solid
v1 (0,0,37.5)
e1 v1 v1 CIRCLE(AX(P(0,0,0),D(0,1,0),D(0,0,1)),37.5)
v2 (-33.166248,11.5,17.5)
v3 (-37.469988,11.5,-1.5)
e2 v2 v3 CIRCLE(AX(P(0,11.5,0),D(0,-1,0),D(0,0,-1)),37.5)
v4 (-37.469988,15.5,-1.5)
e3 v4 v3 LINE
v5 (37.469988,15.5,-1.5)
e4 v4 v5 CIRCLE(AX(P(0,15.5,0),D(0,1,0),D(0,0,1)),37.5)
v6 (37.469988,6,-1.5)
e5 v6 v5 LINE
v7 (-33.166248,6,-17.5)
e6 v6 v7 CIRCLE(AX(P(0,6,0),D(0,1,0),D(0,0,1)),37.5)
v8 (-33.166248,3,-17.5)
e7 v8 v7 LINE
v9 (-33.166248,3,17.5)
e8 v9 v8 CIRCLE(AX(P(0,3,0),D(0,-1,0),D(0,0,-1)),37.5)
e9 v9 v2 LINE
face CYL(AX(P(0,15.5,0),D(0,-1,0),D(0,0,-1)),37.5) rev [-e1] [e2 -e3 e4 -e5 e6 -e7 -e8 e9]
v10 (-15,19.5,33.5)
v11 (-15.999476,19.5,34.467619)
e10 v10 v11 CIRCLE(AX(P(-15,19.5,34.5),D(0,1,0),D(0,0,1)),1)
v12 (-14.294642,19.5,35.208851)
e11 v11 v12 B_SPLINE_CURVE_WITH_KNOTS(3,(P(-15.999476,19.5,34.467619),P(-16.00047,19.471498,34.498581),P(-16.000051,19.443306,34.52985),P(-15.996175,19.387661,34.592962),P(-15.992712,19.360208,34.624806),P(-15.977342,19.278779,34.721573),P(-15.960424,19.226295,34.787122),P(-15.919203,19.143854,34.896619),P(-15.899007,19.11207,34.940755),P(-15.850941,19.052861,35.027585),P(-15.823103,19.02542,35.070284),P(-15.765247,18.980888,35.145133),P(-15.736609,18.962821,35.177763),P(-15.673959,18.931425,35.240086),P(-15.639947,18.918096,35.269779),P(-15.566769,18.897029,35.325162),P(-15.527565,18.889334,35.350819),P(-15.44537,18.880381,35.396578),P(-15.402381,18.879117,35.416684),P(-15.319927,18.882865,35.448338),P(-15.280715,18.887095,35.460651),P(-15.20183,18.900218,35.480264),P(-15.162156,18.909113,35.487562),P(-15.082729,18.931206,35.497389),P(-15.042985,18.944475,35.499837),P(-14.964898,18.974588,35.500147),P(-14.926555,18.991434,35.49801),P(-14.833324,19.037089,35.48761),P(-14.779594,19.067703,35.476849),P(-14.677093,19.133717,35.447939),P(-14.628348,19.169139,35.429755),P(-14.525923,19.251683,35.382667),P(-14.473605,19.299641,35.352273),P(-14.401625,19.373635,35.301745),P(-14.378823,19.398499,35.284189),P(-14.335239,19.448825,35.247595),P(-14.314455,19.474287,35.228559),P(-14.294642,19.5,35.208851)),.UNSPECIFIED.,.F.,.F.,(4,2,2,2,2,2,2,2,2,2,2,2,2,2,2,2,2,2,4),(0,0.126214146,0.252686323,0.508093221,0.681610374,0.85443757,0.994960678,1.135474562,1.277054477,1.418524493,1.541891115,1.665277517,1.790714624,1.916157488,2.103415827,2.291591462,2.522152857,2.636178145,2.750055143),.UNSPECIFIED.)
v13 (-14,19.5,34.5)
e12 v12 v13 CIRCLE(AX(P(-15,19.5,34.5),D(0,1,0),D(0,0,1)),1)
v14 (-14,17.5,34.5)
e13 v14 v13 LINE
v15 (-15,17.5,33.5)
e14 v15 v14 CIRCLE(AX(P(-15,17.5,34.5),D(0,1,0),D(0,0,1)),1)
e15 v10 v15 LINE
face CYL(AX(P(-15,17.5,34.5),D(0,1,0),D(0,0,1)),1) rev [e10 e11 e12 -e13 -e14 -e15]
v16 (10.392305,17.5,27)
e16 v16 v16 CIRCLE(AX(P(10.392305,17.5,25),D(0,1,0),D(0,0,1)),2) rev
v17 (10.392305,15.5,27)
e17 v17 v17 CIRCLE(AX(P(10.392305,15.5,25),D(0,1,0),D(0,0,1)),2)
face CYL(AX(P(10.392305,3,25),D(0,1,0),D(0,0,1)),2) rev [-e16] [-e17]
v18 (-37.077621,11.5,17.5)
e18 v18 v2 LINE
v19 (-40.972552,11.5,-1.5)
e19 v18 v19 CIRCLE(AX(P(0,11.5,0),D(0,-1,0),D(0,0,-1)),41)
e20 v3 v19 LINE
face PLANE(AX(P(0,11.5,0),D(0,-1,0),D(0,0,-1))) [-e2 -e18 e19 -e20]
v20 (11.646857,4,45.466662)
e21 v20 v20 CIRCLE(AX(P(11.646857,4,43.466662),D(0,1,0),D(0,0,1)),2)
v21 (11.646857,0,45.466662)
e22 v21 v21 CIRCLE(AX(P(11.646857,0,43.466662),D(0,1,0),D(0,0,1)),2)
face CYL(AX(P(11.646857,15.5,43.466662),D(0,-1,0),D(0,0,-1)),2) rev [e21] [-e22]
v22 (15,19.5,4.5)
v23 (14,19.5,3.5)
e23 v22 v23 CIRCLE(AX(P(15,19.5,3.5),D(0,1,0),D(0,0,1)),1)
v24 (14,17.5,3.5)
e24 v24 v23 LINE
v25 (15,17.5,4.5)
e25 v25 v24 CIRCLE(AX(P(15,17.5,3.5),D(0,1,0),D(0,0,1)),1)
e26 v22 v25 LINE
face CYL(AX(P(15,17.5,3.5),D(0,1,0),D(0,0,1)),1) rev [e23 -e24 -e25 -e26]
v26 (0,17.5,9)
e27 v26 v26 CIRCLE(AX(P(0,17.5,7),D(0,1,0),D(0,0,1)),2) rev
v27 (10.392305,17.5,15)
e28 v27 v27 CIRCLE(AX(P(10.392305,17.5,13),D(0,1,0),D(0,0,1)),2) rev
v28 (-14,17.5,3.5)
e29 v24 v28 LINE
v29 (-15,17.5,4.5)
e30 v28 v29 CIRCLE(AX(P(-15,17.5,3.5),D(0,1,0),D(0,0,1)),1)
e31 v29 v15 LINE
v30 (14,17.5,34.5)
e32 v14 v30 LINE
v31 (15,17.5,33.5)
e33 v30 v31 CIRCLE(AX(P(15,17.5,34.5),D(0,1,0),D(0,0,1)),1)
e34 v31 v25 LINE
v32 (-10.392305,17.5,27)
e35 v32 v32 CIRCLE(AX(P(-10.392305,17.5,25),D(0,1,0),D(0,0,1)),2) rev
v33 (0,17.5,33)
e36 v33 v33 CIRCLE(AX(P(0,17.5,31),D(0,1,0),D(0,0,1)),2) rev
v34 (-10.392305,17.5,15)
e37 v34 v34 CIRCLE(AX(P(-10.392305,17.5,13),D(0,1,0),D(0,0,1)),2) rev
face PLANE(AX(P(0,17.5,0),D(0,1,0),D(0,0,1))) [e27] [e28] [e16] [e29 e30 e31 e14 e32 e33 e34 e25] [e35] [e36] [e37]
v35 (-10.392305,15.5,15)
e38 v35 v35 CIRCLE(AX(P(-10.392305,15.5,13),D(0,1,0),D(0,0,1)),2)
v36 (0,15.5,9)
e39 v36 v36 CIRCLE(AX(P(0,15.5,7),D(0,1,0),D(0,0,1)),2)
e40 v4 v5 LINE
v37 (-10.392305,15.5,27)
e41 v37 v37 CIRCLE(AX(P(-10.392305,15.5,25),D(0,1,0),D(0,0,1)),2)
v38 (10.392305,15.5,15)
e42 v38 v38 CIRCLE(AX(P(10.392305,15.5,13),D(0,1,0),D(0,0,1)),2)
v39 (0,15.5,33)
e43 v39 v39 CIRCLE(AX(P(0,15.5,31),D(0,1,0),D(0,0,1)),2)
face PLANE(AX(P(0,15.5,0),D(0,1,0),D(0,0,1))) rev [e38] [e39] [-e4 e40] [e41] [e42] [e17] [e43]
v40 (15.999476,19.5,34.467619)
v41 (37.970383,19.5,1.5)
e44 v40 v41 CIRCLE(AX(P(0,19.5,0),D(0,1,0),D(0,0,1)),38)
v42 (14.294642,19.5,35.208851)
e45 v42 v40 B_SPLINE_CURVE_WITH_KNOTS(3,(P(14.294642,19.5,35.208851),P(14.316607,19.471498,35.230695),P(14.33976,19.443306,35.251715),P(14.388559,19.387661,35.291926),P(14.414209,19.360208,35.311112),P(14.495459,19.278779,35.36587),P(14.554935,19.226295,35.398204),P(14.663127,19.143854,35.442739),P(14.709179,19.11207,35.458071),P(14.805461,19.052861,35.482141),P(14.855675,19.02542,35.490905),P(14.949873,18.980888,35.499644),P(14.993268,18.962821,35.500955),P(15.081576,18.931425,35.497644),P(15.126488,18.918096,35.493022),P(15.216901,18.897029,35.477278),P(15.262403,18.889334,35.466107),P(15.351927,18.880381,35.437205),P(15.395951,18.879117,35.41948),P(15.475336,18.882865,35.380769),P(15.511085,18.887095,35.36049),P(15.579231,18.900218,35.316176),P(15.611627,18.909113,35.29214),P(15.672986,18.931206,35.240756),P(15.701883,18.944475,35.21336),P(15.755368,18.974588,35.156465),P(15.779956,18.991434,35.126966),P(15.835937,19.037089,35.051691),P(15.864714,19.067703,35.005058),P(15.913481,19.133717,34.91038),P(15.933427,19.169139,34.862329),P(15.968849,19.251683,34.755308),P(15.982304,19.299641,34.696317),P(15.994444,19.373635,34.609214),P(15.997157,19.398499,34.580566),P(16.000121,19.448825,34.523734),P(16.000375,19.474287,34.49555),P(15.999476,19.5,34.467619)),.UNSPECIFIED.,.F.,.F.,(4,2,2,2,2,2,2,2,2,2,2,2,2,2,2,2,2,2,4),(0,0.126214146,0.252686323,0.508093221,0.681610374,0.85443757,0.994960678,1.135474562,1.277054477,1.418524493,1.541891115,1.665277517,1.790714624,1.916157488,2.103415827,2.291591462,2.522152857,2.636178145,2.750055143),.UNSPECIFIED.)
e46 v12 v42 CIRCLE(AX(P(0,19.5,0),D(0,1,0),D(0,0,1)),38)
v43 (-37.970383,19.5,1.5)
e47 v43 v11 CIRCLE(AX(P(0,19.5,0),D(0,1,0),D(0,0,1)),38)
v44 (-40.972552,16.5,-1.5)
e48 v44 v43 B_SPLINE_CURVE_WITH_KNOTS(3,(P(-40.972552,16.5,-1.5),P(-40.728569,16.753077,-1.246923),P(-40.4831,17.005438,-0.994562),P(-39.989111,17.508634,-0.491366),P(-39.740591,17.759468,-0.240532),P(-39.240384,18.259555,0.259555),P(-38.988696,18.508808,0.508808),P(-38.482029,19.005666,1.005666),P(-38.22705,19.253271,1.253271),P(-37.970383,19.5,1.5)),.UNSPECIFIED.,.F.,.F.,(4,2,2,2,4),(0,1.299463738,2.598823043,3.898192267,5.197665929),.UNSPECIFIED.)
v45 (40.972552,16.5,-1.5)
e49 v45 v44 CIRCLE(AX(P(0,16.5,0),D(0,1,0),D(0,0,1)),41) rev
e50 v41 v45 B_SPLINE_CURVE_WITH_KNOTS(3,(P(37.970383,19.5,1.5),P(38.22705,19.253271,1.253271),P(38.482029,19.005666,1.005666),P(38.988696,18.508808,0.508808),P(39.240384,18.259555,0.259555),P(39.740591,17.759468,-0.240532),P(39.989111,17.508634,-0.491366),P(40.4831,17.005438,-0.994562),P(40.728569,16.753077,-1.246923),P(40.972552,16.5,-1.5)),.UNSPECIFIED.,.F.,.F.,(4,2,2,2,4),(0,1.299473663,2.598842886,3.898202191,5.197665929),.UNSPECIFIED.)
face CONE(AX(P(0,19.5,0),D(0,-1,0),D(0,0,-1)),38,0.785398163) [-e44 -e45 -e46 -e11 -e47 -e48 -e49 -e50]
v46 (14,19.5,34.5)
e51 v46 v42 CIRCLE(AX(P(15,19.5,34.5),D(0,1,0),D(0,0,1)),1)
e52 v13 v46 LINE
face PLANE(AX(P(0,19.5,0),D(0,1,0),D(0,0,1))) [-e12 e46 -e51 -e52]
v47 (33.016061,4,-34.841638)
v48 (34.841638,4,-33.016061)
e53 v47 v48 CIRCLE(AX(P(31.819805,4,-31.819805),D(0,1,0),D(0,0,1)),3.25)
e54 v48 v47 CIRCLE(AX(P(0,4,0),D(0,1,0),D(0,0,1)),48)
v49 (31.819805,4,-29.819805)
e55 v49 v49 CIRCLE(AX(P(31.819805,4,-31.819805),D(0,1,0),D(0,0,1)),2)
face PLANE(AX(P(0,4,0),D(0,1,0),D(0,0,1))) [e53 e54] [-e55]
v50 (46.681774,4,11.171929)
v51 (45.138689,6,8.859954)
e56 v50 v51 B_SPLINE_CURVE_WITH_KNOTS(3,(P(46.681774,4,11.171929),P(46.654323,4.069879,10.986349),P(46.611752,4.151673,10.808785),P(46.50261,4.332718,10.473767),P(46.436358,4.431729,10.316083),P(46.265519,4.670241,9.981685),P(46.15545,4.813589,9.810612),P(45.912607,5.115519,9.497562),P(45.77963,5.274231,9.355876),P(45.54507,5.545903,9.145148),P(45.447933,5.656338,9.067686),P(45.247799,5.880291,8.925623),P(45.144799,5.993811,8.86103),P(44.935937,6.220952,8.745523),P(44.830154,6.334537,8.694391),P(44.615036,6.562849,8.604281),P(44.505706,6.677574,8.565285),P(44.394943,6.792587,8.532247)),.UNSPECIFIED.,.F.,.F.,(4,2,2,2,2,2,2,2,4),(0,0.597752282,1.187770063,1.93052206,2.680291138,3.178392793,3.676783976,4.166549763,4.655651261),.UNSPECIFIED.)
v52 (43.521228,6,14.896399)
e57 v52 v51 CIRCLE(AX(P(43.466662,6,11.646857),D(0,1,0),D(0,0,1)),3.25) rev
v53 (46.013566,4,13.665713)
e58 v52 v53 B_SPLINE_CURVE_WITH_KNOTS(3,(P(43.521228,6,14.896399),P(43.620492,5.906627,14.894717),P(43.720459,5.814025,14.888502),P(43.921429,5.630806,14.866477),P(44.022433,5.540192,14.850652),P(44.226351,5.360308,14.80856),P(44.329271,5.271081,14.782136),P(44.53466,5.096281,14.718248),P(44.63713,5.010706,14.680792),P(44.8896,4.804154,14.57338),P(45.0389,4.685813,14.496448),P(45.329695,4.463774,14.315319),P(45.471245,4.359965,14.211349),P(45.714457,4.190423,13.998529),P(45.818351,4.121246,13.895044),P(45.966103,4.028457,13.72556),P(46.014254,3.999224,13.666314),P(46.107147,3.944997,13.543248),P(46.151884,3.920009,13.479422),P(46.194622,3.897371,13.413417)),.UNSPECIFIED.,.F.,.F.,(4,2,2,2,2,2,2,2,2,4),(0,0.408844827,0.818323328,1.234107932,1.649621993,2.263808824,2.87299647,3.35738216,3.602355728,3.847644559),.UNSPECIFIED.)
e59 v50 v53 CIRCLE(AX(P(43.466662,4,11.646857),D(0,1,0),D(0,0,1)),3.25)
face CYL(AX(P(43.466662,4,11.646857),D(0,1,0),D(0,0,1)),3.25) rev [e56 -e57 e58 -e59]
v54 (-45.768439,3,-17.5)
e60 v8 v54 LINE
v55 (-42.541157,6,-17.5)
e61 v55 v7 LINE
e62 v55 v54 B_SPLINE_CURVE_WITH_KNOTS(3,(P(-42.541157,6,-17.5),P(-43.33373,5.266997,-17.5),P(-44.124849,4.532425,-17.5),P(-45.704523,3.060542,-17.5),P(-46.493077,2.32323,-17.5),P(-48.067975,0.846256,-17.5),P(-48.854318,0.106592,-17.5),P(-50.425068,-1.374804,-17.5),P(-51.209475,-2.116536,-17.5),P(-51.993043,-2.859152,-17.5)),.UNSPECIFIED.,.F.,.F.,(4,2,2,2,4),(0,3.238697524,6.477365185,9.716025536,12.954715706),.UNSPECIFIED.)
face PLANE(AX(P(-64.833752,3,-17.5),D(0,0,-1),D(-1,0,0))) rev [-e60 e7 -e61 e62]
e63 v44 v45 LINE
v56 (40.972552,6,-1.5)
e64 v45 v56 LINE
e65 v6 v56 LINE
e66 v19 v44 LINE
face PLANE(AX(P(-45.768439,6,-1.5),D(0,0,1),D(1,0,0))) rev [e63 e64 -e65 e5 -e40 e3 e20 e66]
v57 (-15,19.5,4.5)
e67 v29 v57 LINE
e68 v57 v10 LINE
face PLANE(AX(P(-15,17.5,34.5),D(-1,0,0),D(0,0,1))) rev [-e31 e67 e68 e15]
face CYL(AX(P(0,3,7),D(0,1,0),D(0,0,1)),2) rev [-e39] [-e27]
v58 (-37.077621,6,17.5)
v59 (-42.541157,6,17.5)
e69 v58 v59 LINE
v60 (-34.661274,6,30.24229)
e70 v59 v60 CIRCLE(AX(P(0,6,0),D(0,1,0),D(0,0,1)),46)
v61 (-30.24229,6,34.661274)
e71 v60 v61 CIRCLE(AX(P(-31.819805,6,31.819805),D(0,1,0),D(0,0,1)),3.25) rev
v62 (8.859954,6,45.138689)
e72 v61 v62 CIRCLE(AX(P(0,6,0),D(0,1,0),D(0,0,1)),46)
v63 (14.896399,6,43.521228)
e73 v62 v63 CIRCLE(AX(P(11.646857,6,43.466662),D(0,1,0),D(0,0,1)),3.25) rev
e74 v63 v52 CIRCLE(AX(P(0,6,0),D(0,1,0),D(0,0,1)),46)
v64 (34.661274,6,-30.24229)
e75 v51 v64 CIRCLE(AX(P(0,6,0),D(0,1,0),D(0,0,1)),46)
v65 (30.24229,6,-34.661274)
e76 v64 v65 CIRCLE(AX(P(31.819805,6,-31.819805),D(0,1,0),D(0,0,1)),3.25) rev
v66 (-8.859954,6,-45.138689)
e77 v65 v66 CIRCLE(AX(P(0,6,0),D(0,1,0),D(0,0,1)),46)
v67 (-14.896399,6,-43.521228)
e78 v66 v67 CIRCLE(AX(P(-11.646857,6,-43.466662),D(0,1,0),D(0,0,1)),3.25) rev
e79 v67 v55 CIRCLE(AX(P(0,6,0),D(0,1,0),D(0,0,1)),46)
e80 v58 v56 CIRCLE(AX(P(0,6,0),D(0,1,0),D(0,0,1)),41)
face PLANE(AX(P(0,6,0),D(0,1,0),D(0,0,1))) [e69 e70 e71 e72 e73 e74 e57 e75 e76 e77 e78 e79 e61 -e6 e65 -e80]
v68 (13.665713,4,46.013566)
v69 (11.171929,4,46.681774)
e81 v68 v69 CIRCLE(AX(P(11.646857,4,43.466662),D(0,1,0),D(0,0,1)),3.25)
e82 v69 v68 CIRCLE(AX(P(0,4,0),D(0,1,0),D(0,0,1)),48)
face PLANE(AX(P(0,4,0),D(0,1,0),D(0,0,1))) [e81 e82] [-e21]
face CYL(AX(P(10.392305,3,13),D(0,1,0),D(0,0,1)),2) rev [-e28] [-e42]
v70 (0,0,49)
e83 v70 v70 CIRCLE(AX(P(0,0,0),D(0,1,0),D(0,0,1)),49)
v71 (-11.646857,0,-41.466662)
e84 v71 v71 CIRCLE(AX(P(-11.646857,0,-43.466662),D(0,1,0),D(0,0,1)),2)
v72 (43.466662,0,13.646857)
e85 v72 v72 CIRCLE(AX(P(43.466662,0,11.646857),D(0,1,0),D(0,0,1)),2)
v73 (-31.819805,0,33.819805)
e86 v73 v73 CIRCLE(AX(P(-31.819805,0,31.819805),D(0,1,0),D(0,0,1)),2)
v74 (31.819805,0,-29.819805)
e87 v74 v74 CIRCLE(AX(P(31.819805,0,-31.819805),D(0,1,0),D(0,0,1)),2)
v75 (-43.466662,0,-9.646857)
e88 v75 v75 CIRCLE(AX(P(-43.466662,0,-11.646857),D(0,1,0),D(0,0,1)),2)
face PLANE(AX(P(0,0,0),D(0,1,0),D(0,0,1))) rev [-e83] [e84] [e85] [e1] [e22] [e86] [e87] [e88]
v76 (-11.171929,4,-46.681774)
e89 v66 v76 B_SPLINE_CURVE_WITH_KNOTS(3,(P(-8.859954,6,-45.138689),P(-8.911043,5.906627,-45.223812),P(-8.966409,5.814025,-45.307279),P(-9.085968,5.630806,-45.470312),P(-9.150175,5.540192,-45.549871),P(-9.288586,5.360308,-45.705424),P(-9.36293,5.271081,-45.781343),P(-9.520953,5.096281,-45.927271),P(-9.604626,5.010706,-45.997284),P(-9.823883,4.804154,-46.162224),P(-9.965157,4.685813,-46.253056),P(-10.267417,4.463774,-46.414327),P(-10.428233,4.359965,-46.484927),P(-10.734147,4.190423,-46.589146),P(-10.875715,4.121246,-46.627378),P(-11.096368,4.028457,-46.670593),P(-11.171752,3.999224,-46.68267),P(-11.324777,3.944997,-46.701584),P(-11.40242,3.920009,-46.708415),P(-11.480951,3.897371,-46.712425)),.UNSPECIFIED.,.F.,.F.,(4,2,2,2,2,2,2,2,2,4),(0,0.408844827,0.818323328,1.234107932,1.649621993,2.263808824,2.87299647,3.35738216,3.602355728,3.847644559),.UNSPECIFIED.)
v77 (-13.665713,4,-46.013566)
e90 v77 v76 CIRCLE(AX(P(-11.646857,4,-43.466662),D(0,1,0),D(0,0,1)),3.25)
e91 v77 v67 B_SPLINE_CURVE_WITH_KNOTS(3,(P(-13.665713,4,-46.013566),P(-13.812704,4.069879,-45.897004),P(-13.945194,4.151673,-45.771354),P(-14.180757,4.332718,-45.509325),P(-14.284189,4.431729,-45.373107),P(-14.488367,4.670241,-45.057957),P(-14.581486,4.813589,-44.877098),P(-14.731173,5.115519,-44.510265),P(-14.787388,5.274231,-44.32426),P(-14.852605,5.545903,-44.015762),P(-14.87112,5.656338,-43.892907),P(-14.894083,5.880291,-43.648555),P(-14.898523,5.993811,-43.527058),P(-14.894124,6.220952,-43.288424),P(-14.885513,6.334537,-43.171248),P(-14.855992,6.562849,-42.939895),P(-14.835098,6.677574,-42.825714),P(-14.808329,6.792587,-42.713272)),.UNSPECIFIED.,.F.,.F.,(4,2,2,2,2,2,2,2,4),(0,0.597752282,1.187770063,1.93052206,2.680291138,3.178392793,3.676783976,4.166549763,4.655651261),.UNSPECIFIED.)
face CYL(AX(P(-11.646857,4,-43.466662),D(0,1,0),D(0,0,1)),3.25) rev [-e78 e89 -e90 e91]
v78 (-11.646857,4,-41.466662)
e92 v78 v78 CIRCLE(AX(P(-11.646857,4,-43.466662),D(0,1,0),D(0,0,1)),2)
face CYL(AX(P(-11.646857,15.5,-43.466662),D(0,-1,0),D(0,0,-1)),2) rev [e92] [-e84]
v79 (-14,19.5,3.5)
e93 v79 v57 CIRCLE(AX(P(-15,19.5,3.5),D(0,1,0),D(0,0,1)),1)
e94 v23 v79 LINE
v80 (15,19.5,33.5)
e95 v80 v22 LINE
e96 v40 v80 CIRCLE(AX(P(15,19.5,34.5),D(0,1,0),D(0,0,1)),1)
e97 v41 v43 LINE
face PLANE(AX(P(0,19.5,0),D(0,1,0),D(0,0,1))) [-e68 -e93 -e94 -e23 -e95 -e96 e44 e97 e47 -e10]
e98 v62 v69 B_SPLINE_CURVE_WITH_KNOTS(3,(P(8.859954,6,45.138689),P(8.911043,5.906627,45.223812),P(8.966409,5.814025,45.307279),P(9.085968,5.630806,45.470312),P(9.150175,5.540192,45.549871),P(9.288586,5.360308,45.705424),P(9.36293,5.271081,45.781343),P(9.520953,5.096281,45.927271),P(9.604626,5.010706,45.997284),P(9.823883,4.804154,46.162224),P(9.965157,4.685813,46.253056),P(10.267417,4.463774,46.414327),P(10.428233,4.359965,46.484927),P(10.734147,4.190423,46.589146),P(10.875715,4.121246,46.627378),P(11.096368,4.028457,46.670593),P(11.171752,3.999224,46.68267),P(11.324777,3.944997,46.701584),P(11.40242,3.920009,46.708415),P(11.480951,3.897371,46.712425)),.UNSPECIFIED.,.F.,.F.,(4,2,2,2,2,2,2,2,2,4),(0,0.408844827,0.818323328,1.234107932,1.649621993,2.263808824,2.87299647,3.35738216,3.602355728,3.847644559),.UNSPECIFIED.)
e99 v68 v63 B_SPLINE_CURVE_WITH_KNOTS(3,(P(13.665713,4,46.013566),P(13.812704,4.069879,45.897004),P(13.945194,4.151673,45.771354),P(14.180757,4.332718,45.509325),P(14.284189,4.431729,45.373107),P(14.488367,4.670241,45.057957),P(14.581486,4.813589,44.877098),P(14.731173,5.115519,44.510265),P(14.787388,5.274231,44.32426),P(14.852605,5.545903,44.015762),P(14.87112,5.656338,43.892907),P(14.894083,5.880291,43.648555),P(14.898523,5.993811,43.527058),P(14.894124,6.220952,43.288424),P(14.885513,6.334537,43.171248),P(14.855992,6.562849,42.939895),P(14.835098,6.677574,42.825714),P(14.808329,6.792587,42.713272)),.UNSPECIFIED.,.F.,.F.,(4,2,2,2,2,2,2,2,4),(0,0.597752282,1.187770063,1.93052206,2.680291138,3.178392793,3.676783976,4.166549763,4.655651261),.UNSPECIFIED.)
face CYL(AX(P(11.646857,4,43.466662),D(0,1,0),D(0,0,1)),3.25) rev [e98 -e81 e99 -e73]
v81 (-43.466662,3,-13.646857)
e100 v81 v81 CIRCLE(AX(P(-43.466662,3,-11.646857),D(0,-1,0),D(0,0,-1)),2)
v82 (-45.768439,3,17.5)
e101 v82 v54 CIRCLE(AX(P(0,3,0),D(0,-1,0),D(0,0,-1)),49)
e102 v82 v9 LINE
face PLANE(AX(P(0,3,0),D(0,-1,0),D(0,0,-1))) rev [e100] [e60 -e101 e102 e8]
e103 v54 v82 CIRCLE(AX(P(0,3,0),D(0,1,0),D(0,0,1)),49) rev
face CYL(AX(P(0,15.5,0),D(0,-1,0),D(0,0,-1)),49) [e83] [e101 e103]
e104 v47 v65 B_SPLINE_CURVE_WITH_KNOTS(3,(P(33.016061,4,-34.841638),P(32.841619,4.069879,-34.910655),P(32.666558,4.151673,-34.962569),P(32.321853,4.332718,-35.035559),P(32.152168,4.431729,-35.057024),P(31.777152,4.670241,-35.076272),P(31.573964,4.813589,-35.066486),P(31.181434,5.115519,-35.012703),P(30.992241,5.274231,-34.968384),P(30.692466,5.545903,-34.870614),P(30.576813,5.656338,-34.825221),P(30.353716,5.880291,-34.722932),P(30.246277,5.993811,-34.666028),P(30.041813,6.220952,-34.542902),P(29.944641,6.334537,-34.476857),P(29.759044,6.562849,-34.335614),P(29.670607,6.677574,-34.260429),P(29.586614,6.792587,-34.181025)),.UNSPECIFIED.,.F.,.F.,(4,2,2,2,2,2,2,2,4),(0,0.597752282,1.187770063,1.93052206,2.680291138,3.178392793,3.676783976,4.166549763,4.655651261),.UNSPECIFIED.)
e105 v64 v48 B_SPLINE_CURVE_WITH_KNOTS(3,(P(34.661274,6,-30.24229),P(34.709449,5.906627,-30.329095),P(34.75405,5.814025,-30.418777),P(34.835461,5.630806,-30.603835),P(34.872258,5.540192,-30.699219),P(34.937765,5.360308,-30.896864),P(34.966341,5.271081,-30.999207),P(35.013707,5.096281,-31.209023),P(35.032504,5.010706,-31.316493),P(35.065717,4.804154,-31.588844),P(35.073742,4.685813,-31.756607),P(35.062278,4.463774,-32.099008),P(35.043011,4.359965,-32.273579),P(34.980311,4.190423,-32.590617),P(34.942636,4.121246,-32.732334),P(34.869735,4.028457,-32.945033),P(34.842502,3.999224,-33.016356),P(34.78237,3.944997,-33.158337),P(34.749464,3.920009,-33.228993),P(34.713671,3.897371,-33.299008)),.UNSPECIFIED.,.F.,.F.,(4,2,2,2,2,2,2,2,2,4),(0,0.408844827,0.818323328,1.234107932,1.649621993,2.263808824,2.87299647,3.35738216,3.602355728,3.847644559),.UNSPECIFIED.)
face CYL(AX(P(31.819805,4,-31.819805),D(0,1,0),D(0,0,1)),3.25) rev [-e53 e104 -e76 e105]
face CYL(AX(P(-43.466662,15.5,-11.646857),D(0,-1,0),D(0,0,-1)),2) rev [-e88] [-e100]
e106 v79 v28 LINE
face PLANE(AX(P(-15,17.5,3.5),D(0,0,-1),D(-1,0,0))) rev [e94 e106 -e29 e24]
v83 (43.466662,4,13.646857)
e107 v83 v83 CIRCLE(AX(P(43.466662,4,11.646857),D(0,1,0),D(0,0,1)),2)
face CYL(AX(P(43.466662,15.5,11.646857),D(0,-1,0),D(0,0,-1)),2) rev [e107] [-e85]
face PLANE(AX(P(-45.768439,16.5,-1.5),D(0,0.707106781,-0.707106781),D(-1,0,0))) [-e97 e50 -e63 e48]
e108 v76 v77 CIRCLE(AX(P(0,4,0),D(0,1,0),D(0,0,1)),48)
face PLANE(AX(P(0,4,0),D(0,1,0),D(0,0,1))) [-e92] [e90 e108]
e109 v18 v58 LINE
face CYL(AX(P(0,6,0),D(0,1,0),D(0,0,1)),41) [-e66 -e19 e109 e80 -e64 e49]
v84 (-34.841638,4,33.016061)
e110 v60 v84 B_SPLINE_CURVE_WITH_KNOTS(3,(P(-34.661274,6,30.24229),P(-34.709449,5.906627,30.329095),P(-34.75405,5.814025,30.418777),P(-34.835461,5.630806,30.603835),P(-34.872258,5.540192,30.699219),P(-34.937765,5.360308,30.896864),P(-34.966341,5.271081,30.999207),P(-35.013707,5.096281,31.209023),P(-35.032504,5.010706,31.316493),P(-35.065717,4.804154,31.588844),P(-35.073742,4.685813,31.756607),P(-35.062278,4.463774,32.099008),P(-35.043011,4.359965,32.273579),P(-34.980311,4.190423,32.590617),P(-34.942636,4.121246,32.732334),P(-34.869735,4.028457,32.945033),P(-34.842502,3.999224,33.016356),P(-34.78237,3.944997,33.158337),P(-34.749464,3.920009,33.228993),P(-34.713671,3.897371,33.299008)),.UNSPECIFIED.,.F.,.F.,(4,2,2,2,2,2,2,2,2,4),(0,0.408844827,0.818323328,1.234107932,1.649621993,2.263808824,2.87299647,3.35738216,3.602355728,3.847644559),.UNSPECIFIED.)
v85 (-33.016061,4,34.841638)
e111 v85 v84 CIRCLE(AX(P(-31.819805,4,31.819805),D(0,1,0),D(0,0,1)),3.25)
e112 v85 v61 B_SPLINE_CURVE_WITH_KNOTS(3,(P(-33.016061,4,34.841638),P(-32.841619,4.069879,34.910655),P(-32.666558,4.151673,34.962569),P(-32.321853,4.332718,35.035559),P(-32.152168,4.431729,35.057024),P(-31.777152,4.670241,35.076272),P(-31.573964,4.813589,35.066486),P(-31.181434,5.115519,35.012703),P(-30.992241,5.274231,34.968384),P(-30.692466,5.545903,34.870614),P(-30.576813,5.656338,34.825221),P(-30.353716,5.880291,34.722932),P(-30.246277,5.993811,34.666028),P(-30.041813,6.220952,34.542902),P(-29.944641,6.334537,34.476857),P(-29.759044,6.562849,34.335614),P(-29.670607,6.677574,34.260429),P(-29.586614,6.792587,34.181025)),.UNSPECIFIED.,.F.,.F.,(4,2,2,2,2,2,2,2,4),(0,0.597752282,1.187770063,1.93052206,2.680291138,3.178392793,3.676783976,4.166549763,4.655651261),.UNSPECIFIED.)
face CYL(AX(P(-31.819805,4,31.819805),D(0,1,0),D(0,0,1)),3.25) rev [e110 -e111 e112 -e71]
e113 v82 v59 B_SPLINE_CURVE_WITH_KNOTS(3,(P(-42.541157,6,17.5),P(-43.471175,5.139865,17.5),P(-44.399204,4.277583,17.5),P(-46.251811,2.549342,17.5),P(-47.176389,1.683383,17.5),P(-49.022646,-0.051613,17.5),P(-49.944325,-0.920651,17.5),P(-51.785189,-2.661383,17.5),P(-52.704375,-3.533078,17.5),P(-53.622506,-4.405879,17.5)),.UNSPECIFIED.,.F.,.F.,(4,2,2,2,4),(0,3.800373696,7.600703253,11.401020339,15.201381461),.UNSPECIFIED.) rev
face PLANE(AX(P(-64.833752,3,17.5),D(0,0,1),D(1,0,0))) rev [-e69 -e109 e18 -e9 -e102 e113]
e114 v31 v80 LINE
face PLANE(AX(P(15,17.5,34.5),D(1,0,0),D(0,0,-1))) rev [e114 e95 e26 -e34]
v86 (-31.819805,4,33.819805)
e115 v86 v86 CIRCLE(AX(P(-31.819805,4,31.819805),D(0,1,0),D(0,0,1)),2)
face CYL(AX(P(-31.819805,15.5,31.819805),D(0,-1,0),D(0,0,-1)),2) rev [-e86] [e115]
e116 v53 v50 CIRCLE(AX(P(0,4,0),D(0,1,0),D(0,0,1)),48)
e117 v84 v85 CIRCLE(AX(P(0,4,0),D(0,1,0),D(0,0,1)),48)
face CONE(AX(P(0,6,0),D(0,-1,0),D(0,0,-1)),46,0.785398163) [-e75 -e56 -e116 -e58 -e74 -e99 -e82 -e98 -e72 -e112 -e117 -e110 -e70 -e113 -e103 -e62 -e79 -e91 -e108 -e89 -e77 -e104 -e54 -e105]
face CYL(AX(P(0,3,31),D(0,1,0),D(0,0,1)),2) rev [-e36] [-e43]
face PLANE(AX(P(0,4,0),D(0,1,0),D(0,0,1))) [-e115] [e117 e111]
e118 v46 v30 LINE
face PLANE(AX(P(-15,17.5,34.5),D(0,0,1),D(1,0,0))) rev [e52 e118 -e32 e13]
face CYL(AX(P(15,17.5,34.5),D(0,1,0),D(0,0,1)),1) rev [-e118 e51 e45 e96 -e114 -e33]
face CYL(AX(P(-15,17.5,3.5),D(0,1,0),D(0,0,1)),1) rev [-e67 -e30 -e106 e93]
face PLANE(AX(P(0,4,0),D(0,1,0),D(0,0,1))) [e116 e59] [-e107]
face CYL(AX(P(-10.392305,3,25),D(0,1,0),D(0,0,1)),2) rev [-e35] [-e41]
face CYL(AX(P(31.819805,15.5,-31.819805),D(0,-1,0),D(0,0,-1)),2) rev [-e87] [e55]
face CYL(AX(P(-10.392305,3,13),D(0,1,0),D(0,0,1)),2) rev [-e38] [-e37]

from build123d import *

# Parameters (mm, degrees)
SKETCH_1_R           = 49
SKETCH_1_R_2         = 37.5
SKETCH_1_R_3         = 2
EXTRUDE_1_DEPTH      = 15.5
EXTRUDE_START        = 15.5
SKETCH_1_3_R         = 49
SKETCH_1_3_R_2       = 2
EXTRUDE_2_DEPTH      = 4
CUT_EXTRUDE_START    = -8
SKETCH_2_W           = 31.667504192
SKETCH_2_H           = 35
CUT_EXTRUDE_1_DEPTH  = 8.5
SKETCH_4_R           = 3.25
CUT_EXTRUDE_3_DEPTH  = 15.5
CUT_EXTRUDE_START_2  = -13.5
SKETCH_6_R           = 49
SKETCH_6_R_2         = 41
CUT_EXTRUDE_7_DEPTH  = 13.5
SKETCH_8_R           = 2
CUT_EXTRUDE_9_DEPTH  = 16.5
SKETCH_7_W           = 30
SKETCH_7_H           = 31
CUT_EXTRUDE_11_DEPTH = 2
SKETCH_10_R          = 1
CUT_EXTRUDE_13_DEPTH = 2
SKETCH_12_W          = 94.768438907
SKETCH_12_H          = 47.5
CUT_EXTRUDE_14_DEPTH = 13.5
CHAMFER_1_SIZE       = 3
CHAMFER_2_SIZE       = 3
CHAMFER_3_SIZE       = 3


with BuildPart() as part:
    # 스케치1 → 보스-돌출1 (new body)
    with BuildSketch(Plane(origin=(0, 0, 0), x_dir=(1, 0, 0), z_dir=(0, 1, 0))):
        with Locations(Location((0, 0, 0), (0, 0, 270))):
            Circle(SKETCH_1_R)
        with Locations(Location((0, 0, 0), (0, 0, 270))):
            Circle(SKETCH_1_R_2, mode=Mode.SUBTRACT)
        with Locations(Location((-43.466662183, 11.64685703, 0), (0, 0, 270))):
            Circle(SKETCH_1_R_3, mode=Mode.SUBTRACT)
        with Locations(Location((-11.64685703, 43.466662183, 0), (0, 0, 270))):
            Circle(SKETCH_1_R_3, mode=Mode.SUBTRACT)
        with Locations(Location((31.819805153, 31.819805153, 0), (0, 0, 270))):
            Circle(SKETCH_1_R_3, mode=Mode.SUBTRACT)
        with Locations(Location((43.466662183, -11.64685703, 0), (0, 0, 270))):
            Circle(SKETCH_1_R_3, mode=Mode.SUBTRACT)
        with Locations(Location((11.64685703, -43.466662183, 0), (0, 0, 270))):
            Circle(SKETCH_1_R_3, mode=Mode.SUBTRACT)
        with Locations(Location((-31.819805153, -31.819805153, 0), (0, 0, 270))):
            Circle(SKETCH_1_R_3, mode=Mode.SUBTRACT)
    extrude(amount=EXTRUDE_1_DEPTH)

    # 스케치1<3> → 보스-돌출2 (add)
    with BuildSketch(Plane(origin=(0, 0, 0), x_dir=(1, 0, 0), z_dir=(0, 1, 0)).offset(EXTRUDE_START)):
        with Locations(Location((0, 0, 0), (0, 0, 270))):
            Circle(SKETCH_1_3_R)
        with Locations(Location((-43.466662183, 11.64685703, 0), (0, 0, 270))):
            Circle(SKETCH_1_3_R_2, mode=Mode.SUBTRACT)
        with Locations(Location((-11.64685703, 43.466662183, 0), (0, 0, 270))):
            Circle(SKETCH_1_3_R_2, mode=Mode.SUBTRACT)
        with Locations(Location((31.819805153, 31.819805153, 0), (0, 0, 270))):
            Circle(SKETCH_1_3_R_2, mode=Mode.SUBTRACT)
        with Locations(Location((43.466662183, -11.64685703, 0), (0, 0, 270))):
            Circle(SKETCH_1_3_R_2, mode=Mode.SUBTRACT)
        with Locations(Location((11.64685703, -43.466662183, 0), (0, 0, 270))):
            Circle(SKETCH_1_3_R_2, mode=Mode.SUBTRACT)
        with Locations(Location((-31.819805153, -31.819805153, 0), (0, 0, 270))):
            Circle(SKETCH_1_3_R_2, mode=Mode.SUBTRACT)
    extrude(amount=EXTRUDE_2_DEPTH)

    # 스케치2 → 컷-돌출1 (cut)
    with BuildSketch(Plane(origin=(0, 19.5, 0), x_dir=(1, 0, 0), z_dir=(0, 1, 0)).offset(CUT_EXTRUDE_START)):
        with Locations((-49, 0)):
            Rectangle(SKETCH_2_W, SKETCH_2_H)
    extrude(amount=-CUT_EXTRUDE_1_DEPTH, mode=Mode.SUBTRACT)

    # 스케치4 → 컷-돌출3 (cut)
    with BuildSketch(Plane(origin=(0, 19.5, 0), x_dir=(1, 0, 0), z_dir=(0, 1, 0))):
        with Locations(Location((-11.64685703, 43.466662183, 0), (0, 0, 270))):
            Circle(SKETCH_4_R)
        with Locations(Location((31.819805153, 31.819805153, 0), (0, 0, 270))):
            Circle(SKETCH_4_R)
        with Locations(Location((43.466662183, -11.64685703, 0), (0, 0, 270))):
            Circle(SKETCH_4_R)
        with Locations(Location((11.64685703, -43.466662183, 0), (0, 0, 270))):
            Circle(SKETCH_4_R)
        with Locations(Location((-31.819805153, -31.819805153, 0), (0, 0, 270))):
            Circle(SKETCH_4_R)
        with Locations(Location((-43.466662183, 11.64685703, 0), (0, 0, 270))):
            Circle(SKETCH_4_R)
    extrude(amount=-CUT_EXTRUDE_3_DEPTH, mode=Mode.SUBTRACT)

    # 스케치6 → 컷-돌출7 (cut)
    with BuildSketch(Plane(origin=(0, 19.5, 0), x_dir=(1, 0, 0), z_dir=(0, 1, 0)).offset(CUT_EXTRUDE_START_2)):
        with Locations(Location((0, 0, 0), (0, 0, 159.075167572))):
            Circle(SKETCH_6_R)
        with Locations(Location((0, 0, 0), (0, 0, 270))):
            Circle(SKETCH_6_R_2, mode=Mode.SUBTRACT)
    extrude(amount=CUT_EXTRUDE_7_DEPTH, mode=Mode.SUBTRACT)

    # 스케치8 → 컷-돌출9 (cut)
    with BuildSketch(Plane(origin=(0, 19.5, 0), x_dir=(1, 0, 0), z_dir=(0, 1, 0))):
        with Locations(Location((0, -7, 0), (0, 0, 270))):
            Circle(SKETCH_8_R)
        with Locations(Location((10.392304845, -13, 0), (0, 0, 270))):
            Circle(SKETCH_8_R)
        with Locations(Location((10.392304845, -25, 0), (0, 0, 270))):
            Circle(SKETCH_8_R)
        with Locations(Location((0, -31, 0), (0, 0, 270))):
            Circle(SKETCH_8_R)
        with Locations(Location((-10.392304845, -25, 0), (0, 0, 270))):
            Circle(SKETCH_8_R)
        with Locations(Location((-10.392304845, -13, 0), (0, 0, 270))):
            Circle(SKETCH_8_R)
    extrude(amount=-CUT_EXTRUDE_9_DEPTH, mode=Mode.SUBTRACT)

    # 스케치7 → 컷-돌출11 (cut)
    with BuildSketch(Plane(origin=(0, 19.5, 0), x_dir=(1, 0, 0), z_dir=(0, 1, 0))):
        with Locations((0, -19)):
            Rectangle(SKETCH_7_W, SKETCH_7_H)
    extrude(amount=-CUT_EXTRUDE_11_DEPTH, mode=Mode.SUBTRACT)

    # 스케치10 → 컷-돌출13 (cut)
    with BuildSketch(Plane(origin=(0, 19.5, 0), x_dir=(1, 0, 0), z_dir=(0, 1, 0))):
        with Locations((-15, -3.5)):
            Circle(SKETCH_10_R)
        with Locations((15, -3.5)):
            Circle(SKETCH_10_R)
        with Locations((15, -34.5)):
            Circle(SKETCH_10_R)
        with Locations((-15, -34.5)):
            Circle(SKETCH_10_R)
    extrude(amount=-CUT_EXTRUDE_13_DEPTH, mode=Mode.SUBTRACT)

    # 스케치12 → 컷-돌출14 (cut)
    with BuildSketch(Plane(origin=(0, 19.5, 0), x_dir=(1, 0, 0), z_dir=(0, 1, 0))):
        with Locations((1.615780546, 25.25)):
            Rectangle(SKETCH_12_W, SKETCH_12_H)
    extrude(amount=-CUT_EXTRUDE_14_DEPTH, mode=Mode.SUBTRACT)

    # 모따기1
    chamfer_1_edges = [part.edges().sort_by_distance(p)[0] for p in [
        (0, 19.5, -1.5),
    ]]
    chamfer(chamfer_1_edges, length=CHAMFER_1_SIZE)

    # 모따기2
    # the kernel refuses this chamfer: 3 mm, written as the material it takes off along each edge
    with BuildSketch(Plane(origin=(0, 6, 0), x_dir=(-0.978595972723543, 0, -0.20579096717121165), z_dir=(-0.20579096717121165, 0, 0.978595972723543))) as chamfer_2_piece_1:
        Polygon((49 - CHAMFER_2_SIZE, 0), (49, CHAMFER_2_SIZE), (49, 0), align=None)
    revolve(axis=Axis((0, 6, 0), (0, -1, 0)), revolution_arc=258.124194574, mode=Mode.SUBTRACT)
    with BuildSketch(Plane(origin=(0, 6, 0), x_dir=(-0.9785036629782533, 0, 0.20622943906760932), z_dir=(-0.20622943906760932, 0, -0.9785036629782533))) as chamfer_2_piece_2:
        Polygon((49 - CHAMFER_2_SIZE, 0), (49, -CHAMFER_2_SIZE), (49, 0), align=None)
    revolve(axis=Axis((0, 6, 0), (0, 1, 0)), revolution_arc=78.098521288, mode=Mode.SUBTRACT)

    # 모따기3
    # the kernel refuses this chamfer: 3 mm, written as the material it takes off along each edge
    with BuildSketch(Plane(origin=(0, 19.5, 0), x_dir=(0.9884903448479317, 0, -0.15128396525216095), z_dir=(-0.15128396525216095, 0, -0.9884903448479317))) as chamfer_3_piece_1:
        Polygon((41, CHAMFER_3_SIZE), (41 - CHAMFER_3_SIZE, 0), (41, 0), align=None)
    revolve(axis=Axis((0, 19.5, 0), (0, -1, 0)), revolution_arc=197.402683099, mode=Mode.SUBTRACT)


solid = part.part
